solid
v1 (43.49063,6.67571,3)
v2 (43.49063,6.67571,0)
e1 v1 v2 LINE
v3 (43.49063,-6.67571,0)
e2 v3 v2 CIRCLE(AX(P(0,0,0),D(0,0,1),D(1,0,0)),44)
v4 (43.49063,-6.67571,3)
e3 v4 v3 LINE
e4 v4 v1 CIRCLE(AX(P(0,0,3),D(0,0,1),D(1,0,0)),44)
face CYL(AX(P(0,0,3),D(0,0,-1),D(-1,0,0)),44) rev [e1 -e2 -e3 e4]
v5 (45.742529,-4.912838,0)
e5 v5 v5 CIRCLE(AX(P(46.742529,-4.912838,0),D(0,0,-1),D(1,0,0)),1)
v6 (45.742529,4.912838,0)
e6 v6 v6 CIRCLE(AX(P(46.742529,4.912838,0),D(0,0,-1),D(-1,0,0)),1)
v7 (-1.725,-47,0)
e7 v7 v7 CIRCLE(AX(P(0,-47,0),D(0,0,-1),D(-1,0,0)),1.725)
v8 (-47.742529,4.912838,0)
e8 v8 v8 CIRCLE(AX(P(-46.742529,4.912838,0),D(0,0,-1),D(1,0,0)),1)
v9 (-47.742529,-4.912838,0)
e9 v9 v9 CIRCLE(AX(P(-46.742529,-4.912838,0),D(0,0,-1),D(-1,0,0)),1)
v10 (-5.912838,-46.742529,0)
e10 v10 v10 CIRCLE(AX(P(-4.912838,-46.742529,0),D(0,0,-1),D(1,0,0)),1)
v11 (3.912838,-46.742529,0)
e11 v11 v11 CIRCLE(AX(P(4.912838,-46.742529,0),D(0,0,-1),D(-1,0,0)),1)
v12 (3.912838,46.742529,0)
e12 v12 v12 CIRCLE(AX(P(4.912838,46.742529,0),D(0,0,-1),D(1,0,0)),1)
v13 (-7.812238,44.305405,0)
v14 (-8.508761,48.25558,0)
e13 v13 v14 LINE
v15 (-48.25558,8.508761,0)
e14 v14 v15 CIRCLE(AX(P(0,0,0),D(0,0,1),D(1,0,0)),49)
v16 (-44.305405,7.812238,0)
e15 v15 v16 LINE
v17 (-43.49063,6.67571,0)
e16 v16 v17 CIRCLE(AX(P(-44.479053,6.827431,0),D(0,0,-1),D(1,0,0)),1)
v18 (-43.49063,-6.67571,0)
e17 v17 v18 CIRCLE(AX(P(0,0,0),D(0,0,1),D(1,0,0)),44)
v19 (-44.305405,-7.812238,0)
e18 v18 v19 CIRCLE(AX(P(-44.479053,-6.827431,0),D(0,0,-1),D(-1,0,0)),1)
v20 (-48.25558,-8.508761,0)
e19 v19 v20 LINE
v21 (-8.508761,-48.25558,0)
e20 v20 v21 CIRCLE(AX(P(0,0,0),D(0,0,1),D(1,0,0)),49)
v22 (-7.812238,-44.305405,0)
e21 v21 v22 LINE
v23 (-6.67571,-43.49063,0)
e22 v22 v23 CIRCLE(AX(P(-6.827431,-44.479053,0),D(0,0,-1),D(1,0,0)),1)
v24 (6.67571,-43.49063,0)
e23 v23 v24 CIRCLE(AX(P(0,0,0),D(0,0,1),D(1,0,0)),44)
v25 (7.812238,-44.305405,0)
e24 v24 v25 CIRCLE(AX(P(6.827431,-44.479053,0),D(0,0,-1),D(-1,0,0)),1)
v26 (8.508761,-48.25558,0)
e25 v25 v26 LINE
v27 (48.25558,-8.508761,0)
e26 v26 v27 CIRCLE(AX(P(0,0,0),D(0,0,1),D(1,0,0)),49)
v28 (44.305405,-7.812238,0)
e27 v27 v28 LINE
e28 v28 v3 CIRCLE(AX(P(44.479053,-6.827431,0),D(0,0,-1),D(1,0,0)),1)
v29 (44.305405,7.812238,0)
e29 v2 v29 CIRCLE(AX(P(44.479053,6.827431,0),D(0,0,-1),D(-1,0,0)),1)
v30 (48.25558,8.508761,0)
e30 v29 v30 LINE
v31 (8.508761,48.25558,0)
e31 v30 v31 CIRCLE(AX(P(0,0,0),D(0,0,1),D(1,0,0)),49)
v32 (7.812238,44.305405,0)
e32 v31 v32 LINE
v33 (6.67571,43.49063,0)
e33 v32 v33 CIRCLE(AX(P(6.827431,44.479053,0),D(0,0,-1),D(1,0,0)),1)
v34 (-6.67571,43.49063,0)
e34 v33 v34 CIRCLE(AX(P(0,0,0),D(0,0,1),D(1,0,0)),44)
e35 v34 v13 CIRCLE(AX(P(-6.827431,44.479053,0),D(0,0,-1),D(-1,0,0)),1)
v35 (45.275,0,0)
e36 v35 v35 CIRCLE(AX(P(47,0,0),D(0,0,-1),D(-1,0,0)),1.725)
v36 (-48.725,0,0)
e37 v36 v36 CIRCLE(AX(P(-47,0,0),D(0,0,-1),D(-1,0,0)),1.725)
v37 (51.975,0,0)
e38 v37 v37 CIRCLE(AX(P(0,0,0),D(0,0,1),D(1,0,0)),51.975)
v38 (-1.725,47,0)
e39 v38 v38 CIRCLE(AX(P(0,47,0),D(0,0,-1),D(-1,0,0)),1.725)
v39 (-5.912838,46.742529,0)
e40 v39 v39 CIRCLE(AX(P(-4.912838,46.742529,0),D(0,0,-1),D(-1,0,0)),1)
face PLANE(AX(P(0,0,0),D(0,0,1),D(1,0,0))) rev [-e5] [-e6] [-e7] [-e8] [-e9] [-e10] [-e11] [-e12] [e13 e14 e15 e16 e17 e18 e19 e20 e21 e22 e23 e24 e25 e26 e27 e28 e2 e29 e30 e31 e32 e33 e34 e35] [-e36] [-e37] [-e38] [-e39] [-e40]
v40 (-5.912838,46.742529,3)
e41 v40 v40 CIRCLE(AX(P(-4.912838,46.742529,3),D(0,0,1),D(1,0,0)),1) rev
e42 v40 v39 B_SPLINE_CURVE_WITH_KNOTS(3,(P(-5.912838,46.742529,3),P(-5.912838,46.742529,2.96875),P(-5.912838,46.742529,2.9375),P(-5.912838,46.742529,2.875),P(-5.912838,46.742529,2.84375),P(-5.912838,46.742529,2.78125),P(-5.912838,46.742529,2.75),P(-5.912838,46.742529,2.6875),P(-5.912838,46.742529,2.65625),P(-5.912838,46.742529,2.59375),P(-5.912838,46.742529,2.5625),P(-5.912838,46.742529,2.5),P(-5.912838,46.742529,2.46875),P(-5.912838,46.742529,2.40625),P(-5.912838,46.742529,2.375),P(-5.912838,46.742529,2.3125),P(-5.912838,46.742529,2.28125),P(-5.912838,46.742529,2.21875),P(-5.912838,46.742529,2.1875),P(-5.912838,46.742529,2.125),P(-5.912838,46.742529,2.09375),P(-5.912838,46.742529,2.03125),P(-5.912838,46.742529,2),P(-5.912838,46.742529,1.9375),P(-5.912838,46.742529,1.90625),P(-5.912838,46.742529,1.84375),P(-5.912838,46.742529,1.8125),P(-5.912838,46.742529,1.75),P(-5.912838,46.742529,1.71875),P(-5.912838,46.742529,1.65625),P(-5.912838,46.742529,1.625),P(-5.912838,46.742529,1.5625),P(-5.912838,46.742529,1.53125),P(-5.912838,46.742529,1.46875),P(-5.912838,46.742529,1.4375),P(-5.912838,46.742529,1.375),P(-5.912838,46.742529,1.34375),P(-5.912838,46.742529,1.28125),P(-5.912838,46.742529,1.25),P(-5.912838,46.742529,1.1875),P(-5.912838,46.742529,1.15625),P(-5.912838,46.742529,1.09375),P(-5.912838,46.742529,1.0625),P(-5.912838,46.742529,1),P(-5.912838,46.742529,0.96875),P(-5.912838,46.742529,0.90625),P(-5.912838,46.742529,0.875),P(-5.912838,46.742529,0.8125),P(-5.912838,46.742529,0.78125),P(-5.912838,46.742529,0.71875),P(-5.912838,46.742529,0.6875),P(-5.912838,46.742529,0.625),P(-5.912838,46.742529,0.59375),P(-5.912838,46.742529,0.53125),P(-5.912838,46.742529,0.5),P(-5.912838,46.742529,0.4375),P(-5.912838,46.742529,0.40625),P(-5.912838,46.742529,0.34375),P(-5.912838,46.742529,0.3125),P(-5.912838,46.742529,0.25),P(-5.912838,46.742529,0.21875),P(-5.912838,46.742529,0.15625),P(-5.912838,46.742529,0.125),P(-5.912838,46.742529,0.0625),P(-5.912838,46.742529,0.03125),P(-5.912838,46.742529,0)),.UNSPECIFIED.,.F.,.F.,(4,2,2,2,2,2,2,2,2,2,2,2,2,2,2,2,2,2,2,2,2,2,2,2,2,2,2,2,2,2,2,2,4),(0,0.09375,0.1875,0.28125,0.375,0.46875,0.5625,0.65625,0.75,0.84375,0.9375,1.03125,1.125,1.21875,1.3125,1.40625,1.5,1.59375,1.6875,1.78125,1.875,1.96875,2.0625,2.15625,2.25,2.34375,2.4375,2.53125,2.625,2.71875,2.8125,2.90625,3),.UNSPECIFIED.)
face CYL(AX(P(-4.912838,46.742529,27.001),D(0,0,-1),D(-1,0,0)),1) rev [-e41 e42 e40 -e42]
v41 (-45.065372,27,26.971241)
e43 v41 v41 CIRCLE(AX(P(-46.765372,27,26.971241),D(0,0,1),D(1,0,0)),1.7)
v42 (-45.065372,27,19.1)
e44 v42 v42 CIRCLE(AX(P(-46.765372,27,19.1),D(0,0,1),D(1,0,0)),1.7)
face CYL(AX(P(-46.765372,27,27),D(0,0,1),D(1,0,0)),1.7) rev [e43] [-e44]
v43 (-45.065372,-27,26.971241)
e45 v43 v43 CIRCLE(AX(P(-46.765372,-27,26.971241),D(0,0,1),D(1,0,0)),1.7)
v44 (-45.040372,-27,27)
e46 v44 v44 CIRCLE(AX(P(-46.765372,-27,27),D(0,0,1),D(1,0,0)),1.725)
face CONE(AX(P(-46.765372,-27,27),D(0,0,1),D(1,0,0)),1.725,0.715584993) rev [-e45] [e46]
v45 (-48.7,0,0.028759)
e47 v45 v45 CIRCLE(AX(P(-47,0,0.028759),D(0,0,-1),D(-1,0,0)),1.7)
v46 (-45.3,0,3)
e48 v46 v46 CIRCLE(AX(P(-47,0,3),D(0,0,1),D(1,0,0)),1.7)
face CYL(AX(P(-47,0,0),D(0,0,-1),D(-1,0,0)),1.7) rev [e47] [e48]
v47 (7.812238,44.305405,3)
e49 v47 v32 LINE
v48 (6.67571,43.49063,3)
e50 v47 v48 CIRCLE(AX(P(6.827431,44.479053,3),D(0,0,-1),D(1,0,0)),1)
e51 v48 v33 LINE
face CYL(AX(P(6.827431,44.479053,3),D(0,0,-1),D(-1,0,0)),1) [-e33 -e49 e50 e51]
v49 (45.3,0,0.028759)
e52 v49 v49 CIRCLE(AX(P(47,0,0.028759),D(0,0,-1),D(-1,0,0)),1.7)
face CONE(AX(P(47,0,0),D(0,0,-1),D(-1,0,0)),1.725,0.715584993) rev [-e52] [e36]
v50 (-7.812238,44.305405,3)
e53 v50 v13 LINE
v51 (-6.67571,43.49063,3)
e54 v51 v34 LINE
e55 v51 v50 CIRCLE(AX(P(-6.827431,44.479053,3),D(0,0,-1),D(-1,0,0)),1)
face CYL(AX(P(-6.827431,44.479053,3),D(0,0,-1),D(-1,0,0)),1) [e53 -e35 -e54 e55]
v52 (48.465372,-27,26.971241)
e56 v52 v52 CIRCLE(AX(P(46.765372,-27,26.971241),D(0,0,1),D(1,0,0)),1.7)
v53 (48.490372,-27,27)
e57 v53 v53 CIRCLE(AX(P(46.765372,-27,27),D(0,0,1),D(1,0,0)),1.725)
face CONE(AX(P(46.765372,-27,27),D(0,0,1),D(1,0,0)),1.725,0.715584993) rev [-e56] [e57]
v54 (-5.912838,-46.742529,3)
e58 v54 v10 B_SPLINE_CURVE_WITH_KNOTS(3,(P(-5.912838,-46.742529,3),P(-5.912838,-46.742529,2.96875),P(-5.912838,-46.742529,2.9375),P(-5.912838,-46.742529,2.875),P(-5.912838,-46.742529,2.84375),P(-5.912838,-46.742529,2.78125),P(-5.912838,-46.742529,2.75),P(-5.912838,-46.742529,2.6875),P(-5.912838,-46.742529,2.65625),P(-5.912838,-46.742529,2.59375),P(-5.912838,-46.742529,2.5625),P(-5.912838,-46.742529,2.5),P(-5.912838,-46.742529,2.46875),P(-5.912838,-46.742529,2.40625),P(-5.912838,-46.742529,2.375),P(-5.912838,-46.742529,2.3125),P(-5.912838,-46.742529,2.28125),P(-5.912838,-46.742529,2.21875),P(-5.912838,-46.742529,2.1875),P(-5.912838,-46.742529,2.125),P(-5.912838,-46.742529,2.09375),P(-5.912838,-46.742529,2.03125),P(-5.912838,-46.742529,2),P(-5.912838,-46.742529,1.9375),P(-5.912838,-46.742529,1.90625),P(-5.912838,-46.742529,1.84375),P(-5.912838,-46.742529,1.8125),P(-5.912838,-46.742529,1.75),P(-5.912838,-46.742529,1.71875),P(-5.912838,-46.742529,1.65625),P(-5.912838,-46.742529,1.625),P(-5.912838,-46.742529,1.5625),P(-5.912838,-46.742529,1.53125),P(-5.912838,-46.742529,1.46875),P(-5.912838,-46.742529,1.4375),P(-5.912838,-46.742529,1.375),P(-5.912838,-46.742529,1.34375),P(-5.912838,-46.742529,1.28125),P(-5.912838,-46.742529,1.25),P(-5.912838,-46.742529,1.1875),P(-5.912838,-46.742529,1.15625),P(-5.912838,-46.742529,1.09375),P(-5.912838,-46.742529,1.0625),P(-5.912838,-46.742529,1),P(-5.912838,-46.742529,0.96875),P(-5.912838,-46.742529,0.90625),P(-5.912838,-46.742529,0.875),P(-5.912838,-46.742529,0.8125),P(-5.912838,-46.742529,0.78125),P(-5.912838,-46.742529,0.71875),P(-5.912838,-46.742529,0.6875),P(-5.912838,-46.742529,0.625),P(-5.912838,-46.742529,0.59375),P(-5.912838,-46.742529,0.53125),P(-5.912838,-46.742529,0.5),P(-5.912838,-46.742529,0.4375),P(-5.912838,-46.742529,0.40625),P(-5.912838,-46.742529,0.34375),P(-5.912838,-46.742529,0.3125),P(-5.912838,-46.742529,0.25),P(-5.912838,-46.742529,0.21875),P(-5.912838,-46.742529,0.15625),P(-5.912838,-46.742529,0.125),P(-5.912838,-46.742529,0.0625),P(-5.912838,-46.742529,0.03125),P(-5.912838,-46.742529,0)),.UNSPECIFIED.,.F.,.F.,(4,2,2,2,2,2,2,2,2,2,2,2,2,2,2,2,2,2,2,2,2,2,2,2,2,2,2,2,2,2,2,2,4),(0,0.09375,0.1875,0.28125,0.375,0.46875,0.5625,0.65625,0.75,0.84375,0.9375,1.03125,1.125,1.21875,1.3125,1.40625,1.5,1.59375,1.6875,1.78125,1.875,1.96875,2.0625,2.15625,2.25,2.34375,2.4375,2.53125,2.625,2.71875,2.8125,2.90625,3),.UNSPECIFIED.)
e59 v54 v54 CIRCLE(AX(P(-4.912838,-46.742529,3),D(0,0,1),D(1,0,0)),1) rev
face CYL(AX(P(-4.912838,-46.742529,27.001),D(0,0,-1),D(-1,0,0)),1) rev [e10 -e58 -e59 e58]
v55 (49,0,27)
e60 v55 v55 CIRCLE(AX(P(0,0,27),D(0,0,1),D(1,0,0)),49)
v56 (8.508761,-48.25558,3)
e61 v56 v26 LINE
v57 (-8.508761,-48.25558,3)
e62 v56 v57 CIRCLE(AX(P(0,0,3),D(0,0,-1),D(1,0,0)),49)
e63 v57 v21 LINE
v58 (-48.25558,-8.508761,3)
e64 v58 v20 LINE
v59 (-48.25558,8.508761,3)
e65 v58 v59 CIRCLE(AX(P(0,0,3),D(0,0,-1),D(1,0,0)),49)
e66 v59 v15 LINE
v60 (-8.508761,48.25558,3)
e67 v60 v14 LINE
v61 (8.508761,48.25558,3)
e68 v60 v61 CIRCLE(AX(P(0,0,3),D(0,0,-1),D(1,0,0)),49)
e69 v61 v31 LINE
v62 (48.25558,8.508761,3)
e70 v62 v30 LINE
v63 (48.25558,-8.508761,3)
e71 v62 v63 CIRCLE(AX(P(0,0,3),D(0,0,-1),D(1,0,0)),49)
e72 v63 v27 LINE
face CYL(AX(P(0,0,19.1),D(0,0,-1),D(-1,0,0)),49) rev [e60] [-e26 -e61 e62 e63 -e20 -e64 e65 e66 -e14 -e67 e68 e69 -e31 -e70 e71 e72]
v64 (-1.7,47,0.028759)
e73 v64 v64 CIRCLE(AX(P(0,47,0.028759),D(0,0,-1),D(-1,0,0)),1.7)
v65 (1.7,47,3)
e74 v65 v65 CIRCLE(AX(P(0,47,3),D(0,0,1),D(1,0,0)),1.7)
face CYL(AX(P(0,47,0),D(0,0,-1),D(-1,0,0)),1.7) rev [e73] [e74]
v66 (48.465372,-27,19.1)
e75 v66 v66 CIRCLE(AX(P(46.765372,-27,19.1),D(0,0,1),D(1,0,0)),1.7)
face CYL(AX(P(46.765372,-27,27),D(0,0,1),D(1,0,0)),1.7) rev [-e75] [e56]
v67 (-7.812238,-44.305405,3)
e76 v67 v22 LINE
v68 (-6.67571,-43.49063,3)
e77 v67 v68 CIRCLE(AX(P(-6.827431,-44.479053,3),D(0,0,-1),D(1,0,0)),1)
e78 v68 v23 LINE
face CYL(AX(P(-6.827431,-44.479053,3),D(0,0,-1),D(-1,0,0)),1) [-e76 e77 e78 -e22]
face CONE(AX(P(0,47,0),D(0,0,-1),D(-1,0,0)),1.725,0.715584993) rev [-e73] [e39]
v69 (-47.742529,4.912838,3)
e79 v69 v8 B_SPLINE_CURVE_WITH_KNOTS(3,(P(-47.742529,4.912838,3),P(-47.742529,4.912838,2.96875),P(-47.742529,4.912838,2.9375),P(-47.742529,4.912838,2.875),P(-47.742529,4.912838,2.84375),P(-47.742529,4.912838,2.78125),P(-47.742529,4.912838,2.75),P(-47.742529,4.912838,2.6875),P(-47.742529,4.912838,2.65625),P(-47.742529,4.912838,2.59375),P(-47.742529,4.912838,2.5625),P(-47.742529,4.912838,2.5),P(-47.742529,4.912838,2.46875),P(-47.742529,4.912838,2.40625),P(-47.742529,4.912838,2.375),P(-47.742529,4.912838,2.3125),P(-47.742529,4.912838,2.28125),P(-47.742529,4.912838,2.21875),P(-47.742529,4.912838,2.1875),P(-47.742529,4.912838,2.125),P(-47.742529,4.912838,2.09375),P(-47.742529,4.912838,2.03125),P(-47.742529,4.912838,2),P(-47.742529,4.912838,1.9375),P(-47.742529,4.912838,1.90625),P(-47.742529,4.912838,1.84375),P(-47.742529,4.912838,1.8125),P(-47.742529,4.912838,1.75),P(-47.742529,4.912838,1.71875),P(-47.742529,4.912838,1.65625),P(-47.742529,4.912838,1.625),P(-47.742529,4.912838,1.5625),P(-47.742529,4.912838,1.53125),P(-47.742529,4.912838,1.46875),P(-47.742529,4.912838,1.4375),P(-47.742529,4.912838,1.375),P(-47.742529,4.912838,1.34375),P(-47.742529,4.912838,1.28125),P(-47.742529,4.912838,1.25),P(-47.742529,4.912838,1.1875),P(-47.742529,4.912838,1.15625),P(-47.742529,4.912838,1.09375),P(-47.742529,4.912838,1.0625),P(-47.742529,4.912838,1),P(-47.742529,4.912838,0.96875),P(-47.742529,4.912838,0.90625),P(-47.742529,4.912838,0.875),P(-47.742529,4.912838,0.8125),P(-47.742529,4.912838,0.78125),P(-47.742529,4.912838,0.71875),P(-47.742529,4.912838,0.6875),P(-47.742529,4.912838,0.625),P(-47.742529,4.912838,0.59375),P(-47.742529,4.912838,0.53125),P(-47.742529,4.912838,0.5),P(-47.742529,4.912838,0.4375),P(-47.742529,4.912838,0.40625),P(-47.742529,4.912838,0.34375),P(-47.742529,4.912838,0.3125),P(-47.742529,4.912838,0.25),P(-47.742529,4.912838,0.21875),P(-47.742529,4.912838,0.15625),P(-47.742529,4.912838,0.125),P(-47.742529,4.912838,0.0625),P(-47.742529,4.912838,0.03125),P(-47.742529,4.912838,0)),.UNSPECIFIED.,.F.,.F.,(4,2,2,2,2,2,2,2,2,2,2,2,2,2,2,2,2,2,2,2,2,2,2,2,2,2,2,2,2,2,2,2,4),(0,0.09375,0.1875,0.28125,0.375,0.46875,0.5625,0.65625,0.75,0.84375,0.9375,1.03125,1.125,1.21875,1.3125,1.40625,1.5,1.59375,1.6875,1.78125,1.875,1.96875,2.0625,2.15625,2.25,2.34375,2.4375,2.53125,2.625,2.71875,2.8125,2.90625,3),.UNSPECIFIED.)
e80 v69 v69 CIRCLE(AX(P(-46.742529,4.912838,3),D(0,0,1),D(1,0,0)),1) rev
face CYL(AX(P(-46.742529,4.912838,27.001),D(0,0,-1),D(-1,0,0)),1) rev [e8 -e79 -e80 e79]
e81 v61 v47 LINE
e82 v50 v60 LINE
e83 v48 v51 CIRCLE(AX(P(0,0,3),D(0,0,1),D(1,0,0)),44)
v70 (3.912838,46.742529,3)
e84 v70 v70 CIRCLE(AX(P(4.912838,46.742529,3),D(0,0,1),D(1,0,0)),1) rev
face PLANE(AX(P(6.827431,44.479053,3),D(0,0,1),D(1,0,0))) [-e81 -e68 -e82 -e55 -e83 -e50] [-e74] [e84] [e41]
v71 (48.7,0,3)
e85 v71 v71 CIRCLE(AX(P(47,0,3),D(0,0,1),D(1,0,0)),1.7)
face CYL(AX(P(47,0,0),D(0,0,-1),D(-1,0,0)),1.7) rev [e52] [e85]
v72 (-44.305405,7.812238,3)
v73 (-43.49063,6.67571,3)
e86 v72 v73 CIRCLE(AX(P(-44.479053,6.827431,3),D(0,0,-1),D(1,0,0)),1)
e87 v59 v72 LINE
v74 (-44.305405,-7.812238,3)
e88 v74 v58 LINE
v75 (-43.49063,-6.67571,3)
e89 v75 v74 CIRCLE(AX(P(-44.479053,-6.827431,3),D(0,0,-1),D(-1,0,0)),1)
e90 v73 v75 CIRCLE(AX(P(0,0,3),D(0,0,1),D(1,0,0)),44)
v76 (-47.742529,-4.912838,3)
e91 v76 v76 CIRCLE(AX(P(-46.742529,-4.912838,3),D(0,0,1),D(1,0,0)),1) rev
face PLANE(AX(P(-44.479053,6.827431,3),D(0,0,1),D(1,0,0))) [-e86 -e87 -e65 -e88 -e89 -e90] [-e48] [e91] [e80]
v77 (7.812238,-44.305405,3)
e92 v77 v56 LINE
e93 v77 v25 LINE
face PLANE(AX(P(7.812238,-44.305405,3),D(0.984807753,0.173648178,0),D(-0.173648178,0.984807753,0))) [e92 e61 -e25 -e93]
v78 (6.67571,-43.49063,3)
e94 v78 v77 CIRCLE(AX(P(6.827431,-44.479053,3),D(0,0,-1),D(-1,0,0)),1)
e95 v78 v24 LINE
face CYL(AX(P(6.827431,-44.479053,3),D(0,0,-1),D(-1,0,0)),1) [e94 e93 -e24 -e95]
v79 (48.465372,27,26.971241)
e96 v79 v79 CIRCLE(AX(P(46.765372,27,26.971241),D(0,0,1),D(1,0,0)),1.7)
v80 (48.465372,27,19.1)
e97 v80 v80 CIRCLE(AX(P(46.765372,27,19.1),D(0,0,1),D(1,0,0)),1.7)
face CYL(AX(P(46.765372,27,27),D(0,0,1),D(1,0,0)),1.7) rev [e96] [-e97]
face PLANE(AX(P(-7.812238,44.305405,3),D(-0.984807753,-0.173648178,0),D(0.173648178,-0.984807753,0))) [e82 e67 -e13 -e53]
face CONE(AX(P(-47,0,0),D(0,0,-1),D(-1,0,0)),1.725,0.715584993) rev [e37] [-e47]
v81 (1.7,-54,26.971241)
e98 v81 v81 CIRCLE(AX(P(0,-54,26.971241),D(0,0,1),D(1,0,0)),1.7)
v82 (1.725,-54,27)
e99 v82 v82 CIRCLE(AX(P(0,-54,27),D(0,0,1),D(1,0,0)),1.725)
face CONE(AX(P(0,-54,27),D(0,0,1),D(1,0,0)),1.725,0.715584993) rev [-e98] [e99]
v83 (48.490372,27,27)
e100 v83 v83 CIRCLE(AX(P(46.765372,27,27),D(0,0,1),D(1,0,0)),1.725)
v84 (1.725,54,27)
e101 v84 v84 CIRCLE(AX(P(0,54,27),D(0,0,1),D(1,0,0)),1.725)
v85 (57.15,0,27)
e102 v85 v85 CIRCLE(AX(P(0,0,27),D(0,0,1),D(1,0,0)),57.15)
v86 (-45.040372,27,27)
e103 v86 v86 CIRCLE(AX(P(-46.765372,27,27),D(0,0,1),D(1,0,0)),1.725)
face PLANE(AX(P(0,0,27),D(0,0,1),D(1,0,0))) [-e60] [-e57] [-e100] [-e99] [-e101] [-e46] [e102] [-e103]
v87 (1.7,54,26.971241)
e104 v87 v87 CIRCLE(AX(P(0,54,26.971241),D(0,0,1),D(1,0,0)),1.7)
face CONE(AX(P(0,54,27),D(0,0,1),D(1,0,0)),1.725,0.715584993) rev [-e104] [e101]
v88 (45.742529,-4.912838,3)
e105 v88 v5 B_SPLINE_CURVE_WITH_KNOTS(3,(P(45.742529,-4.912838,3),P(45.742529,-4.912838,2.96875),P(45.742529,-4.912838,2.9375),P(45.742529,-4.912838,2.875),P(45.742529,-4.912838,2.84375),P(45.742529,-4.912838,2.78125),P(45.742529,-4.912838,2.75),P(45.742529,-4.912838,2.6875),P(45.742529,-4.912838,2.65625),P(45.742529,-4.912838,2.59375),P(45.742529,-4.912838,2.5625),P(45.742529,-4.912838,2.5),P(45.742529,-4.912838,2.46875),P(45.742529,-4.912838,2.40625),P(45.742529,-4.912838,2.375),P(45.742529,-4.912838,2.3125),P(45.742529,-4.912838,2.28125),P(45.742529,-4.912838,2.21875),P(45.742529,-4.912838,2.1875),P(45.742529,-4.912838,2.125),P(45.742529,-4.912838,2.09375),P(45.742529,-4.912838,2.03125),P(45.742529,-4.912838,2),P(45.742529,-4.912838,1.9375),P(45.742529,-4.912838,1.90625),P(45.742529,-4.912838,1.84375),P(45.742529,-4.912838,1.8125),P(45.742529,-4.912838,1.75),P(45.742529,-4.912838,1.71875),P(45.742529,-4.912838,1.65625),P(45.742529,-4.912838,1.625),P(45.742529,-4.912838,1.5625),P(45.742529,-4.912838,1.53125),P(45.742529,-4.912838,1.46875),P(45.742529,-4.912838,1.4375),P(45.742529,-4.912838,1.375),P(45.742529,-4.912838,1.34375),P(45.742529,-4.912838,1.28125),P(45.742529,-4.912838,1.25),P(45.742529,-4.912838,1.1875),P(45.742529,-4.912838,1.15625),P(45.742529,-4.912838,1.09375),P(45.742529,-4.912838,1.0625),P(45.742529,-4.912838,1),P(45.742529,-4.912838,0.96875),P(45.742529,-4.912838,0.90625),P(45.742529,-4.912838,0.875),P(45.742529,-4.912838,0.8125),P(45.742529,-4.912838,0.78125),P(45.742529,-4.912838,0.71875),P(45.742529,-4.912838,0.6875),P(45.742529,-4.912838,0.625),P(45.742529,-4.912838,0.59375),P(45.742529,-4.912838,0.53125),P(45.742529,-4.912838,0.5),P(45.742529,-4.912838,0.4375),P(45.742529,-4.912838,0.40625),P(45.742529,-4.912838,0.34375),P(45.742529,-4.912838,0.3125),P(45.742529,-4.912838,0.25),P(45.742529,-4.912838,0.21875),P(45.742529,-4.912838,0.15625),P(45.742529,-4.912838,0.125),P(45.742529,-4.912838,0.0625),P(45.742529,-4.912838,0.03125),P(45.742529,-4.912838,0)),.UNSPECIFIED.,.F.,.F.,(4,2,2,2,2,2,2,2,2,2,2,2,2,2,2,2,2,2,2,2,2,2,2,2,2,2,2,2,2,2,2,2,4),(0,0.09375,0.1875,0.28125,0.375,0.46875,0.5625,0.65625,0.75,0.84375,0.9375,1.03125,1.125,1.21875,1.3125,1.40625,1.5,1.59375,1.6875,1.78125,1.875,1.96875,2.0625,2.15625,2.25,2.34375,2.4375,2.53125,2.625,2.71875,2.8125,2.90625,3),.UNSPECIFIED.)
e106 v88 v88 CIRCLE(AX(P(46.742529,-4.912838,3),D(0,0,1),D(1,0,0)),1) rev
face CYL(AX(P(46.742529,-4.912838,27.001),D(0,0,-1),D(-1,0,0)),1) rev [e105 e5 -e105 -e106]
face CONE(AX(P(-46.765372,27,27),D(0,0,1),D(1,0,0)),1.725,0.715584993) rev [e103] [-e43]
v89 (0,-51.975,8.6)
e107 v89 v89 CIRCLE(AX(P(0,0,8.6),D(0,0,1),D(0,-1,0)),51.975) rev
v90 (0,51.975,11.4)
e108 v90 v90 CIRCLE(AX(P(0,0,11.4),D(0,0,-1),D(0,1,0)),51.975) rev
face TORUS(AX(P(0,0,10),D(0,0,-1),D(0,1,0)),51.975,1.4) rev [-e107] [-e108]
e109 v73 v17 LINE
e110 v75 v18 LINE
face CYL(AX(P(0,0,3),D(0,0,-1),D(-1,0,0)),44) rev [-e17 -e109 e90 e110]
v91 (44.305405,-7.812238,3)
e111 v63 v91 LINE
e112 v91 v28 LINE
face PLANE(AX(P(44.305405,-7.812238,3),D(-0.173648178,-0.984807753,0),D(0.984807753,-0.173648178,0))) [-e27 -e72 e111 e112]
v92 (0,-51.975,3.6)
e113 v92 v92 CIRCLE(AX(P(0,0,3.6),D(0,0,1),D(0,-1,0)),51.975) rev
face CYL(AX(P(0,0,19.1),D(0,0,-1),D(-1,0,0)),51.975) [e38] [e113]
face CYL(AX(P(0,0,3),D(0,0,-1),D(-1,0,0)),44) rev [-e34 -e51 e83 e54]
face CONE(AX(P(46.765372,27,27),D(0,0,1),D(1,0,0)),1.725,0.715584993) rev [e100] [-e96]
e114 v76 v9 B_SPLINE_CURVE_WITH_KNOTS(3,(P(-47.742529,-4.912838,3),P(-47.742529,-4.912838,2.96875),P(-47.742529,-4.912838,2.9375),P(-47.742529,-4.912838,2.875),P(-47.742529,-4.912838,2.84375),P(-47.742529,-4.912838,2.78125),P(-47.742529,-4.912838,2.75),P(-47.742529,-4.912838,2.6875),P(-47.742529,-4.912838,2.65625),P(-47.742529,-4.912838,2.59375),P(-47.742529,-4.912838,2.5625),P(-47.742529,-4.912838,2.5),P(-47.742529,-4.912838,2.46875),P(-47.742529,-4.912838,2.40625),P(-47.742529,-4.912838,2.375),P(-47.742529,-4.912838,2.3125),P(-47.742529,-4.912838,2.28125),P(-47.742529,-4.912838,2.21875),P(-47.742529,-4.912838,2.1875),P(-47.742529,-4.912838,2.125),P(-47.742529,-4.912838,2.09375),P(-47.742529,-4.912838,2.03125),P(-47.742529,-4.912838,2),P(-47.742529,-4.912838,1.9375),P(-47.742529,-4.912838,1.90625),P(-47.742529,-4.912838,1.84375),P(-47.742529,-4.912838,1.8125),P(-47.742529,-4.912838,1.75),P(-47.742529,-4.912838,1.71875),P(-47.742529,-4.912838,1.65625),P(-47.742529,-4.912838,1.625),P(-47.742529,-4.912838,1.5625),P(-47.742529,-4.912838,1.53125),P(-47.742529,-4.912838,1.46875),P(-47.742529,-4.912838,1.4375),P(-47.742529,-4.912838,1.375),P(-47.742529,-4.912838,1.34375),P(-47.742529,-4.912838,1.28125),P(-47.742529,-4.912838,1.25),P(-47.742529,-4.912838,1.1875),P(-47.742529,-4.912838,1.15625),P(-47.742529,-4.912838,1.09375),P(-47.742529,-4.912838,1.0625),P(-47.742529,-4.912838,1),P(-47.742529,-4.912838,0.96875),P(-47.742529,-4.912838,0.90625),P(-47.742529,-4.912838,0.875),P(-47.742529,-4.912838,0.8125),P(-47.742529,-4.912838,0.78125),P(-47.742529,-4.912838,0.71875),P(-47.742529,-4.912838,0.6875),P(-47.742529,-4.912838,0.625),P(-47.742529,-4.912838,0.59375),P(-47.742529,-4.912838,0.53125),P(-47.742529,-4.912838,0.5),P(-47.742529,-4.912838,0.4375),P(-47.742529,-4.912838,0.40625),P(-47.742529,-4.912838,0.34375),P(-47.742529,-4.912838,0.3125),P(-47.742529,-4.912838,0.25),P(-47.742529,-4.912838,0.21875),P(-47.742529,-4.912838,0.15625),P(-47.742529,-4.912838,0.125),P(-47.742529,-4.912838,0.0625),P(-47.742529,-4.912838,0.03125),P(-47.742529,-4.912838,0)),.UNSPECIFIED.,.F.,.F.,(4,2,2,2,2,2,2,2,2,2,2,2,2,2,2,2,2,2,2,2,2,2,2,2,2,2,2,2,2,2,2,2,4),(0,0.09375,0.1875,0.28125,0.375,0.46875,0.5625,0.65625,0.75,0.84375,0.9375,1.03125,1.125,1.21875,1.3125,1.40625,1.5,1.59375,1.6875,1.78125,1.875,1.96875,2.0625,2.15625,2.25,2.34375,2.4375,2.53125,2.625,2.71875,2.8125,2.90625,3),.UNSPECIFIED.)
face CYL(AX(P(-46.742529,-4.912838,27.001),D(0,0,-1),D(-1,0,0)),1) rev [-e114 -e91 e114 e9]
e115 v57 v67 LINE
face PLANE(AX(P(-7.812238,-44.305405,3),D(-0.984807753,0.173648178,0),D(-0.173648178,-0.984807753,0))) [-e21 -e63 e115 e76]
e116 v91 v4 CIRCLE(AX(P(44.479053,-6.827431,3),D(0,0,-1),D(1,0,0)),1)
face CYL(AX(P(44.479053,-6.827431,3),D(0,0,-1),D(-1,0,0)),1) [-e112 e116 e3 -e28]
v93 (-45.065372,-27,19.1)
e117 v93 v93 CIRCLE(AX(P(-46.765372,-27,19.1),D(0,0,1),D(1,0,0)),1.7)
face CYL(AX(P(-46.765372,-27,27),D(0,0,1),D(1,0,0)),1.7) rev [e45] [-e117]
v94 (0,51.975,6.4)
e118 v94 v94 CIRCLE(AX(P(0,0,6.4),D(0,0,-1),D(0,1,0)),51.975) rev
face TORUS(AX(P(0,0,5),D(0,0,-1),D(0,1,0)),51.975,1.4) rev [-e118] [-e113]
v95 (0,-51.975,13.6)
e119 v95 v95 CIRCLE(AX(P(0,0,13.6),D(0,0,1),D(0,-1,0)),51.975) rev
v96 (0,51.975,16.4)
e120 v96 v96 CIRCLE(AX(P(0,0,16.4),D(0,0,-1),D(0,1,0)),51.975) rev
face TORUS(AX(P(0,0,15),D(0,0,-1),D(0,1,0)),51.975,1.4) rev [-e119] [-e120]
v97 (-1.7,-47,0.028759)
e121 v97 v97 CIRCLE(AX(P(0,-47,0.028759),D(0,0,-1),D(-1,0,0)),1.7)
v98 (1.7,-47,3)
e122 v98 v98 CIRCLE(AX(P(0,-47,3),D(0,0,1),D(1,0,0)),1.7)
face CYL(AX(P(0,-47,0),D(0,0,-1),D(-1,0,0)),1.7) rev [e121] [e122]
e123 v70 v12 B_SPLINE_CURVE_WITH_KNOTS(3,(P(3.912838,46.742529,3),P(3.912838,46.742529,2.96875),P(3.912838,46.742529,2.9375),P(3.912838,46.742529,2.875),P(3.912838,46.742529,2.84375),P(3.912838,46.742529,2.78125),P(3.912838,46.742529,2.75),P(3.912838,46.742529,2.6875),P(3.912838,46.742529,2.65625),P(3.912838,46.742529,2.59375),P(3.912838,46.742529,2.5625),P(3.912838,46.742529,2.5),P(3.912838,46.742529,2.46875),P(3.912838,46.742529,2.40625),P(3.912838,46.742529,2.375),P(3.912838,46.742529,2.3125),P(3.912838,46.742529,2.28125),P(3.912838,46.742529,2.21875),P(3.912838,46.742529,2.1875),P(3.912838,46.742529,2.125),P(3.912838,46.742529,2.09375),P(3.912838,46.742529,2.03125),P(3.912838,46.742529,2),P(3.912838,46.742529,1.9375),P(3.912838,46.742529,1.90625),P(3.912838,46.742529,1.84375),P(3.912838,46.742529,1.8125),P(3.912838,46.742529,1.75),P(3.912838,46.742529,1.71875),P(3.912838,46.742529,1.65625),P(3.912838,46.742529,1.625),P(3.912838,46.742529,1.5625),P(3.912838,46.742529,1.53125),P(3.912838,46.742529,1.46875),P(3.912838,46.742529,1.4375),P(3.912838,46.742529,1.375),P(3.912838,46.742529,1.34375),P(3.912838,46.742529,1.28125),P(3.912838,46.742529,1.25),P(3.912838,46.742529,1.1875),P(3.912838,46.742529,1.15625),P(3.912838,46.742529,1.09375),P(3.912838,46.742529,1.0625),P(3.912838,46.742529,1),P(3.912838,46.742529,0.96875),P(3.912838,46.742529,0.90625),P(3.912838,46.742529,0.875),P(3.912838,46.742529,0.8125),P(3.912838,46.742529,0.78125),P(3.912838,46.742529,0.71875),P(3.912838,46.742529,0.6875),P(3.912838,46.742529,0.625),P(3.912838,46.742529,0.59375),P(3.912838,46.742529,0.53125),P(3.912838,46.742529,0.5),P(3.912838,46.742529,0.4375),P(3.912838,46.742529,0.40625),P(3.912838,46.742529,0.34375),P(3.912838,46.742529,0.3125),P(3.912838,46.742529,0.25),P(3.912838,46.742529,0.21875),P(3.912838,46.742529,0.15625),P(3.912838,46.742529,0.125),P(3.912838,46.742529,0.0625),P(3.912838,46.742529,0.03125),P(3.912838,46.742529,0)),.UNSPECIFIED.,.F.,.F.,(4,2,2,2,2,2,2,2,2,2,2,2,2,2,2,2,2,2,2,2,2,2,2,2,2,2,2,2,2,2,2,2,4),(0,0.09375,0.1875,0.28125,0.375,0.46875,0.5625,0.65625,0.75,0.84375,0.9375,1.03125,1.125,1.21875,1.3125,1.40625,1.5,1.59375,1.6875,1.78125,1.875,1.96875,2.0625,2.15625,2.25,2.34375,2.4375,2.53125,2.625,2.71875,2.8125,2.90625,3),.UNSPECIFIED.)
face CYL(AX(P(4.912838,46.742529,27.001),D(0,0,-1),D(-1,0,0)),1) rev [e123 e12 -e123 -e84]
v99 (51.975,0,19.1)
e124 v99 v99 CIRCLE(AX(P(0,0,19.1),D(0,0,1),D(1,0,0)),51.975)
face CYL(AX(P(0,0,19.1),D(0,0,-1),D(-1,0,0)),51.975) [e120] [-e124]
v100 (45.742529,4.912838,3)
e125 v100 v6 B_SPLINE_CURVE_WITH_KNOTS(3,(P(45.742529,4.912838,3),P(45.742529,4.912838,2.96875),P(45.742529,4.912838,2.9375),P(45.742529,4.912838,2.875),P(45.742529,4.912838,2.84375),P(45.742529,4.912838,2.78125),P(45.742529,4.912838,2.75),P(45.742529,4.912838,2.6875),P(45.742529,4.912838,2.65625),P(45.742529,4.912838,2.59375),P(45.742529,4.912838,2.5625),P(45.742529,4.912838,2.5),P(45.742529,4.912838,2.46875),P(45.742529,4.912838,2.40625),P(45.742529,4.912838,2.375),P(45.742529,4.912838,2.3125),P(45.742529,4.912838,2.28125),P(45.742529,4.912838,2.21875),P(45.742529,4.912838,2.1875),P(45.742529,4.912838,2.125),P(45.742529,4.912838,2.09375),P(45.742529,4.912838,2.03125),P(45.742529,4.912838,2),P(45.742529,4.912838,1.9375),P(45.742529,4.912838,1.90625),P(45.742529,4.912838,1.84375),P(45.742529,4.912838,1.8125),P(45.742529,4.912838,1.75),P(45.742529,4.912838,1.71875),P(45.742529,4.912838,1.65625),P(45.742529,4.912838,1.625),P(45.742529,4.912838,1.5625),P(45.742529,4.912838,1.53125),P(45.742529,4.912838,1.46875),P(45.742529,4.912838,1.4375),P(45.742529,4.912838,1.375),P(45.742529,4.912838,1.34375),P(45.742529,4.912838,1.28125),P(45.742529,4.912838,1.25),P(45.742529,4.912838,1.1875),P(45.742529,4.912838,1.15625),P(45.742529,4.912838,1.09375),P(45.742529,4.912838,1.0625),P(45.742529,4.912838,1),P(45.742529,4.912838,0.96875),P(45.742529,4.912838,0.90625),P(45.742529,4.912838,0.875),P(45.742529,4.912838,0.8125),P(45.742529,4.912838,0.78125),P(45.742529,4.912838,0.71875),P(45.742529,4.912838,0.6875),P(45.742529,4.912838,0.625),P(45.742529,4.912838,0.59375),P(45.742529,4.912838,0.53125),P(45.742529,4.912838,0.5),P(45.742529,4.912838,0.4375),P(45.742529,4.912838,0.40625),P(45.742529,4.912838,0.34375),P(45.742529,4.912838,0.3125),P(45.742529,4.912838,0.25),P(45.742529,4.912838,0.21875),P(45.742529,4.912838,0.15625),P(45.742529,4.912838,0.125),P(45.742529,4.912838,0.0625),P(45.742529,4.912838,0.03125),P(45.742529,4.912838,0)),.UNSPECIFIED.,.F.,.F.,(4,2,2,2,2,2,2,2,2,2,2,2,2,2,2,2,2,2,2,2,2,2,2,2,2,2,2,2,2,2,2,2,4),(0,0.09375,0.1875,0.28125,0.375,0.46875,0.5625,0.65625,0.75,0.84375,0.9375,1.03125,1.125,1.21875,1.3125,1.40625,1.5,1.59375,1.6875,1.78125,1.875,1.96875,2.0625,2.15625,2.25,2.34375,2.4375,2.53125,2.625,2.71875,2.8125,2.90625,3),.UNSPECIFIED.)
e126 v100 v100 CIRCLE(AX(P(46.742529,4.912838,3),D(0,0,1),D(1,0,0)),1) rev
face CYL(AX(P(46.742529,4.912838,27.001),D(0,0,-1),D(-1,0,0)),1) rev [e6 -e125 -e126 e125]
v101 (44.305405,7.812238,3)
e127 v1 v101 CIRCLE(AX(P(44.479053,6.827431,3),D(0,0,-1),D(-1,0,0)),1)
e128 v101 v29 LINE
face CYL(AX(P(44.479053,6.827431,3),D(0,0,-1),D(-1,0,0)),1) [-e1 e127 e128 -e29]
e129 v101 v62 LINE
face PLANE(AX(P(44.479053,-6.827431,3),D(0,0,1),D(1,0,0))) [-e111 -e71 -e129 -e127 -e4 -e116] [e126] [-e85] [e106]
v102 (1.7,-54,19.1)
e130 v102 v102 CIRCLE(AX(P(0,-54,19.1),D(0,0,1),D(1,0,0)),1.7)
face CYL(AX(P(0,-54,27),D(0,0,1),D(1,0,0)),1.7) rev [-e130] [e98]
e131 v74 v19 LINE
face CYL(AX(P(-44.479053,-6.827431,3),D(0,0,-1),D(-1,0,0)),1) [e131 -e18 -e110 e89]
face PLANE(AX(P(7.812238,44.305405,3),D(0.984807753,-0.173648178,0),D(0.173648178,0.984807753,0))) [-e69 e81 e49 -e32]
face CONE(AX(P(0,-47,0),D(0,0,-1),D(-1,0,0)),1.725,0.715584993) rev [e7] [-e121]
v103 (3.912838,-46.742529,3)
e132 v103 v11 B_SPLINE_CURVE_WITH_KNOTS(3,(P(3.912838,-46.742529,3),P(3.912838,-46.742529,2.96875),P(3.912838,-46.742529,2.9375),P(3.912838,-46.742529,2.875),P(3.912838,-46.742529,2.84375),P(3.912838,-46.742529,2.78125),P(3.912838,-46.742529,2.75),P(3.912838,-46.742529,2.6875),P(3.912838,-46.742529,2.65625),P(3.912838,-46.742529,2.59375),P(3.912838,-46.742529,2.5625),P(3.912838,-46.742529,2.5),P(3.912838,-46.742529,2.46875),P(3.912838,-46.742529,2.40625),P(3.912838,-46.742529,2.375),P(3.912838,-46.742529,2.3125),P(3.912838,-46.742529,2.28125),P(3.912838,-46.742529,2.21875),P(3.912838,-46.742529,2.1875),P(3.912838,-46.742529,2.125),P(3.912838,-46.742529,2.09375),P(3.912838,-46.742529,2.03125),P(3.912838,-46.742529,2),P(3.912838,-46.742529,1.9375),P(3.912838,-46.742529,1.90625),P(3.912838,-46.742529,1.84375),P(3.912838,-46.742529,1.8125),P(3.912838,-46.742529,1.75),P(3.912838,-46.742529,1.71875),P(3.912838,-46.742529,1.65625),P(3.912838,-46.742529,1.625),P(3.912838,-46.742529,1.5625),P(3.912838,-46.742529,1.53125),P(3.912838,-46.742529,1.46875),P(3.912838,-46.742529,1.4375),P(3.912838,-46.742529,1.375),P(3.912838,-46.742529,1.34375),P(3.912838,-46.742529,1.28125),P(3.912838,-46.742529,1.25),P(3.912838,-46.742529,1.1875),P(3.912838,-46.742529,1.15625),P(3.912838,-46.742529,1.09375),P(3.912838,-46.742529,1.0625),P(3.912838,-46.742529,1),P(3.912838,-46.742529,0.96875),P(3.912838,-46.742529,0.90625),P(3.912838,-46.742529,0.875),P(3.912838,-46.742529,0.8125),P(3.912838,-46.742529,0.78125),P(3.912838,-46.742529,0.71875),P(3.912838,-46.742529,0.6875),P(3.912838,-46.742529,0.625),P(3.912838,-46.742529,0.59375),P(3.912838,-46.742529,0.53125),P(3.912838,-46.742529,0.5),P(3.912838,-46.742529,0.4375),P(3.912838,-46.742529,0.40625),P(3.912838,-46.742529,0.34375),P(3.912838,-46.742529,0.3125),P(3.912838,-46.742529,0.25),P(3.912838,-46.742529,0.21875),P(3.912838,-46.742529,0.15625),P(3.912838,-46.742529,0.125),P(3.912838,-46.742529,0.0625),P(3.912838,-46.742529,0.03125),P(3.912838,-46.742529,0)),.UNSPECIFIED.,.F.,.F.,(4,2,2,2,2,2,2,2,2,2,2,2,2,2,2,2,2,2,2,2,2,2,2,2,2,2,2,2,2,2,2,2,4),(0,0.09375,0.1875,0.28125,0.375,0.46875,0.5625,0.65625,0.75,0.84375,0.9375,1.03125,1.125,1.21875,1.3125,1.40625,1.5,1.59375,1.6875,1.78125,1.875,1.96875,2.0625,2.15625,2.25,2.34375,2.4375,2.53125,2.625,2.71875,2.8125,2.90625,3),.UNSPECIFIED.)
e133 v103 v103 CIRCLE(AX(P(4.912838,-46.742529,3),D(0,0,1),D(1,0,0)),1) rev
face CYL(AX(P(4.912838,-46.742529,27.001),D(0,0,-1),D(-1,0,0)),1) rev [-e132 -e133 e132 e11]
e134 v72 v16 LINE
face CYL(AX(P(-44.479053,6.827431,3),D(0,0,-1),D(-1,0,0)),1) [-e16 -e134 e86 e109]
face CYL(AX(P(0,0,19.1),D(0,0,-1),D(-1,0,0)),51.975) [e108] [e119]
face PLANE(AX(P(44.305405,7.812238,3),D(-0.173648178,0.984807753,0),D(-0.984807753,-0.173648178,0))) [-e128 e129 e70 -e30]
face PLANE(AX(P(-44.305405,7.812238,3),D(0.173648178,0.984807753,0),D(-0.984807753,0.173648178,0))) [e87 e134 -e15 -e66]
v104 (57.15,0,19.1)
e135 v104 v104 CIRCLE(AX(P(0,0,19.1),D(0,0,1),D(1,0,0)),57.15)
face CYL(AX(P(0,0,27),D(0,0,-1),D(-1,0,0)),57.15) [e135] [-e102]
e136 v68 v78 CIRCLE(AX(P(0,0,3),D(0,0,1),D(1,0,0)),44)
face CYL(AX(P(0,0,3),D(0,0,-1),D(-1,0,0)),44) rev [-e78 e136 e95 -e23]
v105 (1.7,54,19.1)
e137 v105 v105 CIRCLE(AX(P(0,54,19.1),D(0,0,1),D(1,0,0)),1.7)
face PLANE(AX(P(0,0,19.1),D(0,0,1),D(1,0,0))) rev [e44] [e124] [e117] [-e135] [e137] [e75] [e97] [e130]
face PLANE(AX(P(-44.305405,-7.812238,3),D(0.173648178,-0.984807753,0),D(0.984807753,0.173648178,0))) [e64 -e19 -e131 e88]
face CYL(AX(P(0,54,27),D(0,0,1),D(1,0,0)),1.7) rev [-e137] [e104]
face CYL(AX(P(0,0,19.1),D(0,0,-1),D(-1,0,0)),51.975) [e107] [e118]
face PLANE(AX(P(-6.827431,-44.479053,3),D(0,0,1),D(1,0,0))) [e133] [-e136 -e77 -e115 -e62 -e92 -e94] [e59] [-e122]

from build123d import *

# Parameters (mm, degrees)
SKETCH_1_R                   = 51.975
SKETCH_1_R_2                 = 49
EXTRUDE_1_DEPTH              = 19.1
SKETCH_2_R                   = 57.15
SKETCH_2_R_2                 = 49
EXTRUDE_2_DEPTH              = 7.9
EXTRUDE_3_DEPTH              = 3
HOLE_WIZARD_M3_1_D           = 3.4
HOLE_WIZARD_M3_1_CSINK_D     = 3.45
HOLE_WIZARD_M3_1_CSINK_ANGLE = 82
CUT_EXTRUDE_1_REACH          = 87.213
SKETCH_6_R                   = 1
SKETCH_12_R                  = 1.4


# Read off the part's stored shape, not the designer's step: M3 すきま穴3
with BuildPart() as part:
    # ｽｹｯﾁ1 → ﾎﾞｽ - 押し出し1 (new body)
    with BuildSketch(Plane.XY):
        Circle(SKETCH_1_R)
        Circle(SKETCH_1_R_2, mode=Mode.SUBTRACT)
    extrude(amount=EXTRUDE_1_DEPTH)

    # ｽｹｯﾁ2 → ﾎﾞｽ - 押し出し2 (add)
    with BuildSketch(Plane.XY.offset(19.1)):
        Circle(SKETCH_2_R)
        Circle(SKETCH_2_R_2, mode=Mode.SUBTRACT)
    extrude(amount=EXTRUDE_2_DEPTH)

    # ｽｹｯﾁ3 → ﾎﾞｽ - 押し出し3 (add)
    with BuildSketch(Plane(origin=(0, 0, 0), x_dir=(-1, 0, 0), z_dir=(0, 0, -1))):
        with BuildLine():
            Line((7.812238333, 44.305405226), (8.508760706, 48.255579898))
            ThreePointArc((8.508760706, 48.255579898), (0, 49), (-8.508760706, 48.255579898))
            Line((-8.508760706, 48.255579898), (-7.812238333, 44.305405226))
            ThreePointArc((-7.812238333, 44.305405226), (-7.410073856, 43.666325397), (-6.6757099, 43.490629995))
            ThreePointArc((-6.6757099, 43.490629995), (0, 44), (6.6757099, 43.490629995))
            ThreePointArc((6.6757099, 43.490629995), (7.410073856, 43.666325397), (7.812238333, 44.305405226))
        make_face()
        with BuildLine():
            Line((44.305405226, -7.812238333), (48.255579898, -8.508760706))
            ThreePointArc((48.255579898, -8.508760706), (49, 0), (48.255579898, 8.508760706))
            Line((48.255579898, 8.508760706), (44.305405226, 7.812238333))
            ThreePointArc((44.305405226, 7.812238333), (43.666325397, 7.410073856), (43.490629995, 6.6757099))
            ThreePointArc((43.490629995, 6.6757099), (44, 0), (43.490629995, -6.6757099))
            ThreePointArc((43.490629995, -6.6757099), (43.666325397, -7.410073856), (44.305405226, -7.812238333))
        make_face()
        with BuildLine():
            Line((-7.812238333, -44.305405226), (-8.508760706, -48.255579898))
            ThreePointArc((-8.508760706, -48.255579898), (0, -49), (8.508760706, -48.255579898))
            Line((8.508760706, -48.255579898), (7.812238333, -44.305405226))
            ThreePointArc((7.812238333, -44.305405226), (7.410073856, -43.666325397), (6.6757099, -43.490629995))
            ThreePointArc((6.6757099, -43.490629995), (0, -44), (-6.6757099, -43.490629995))
            ThreePointArc((-6.6757099, -43.490629995), (-7.410073856, -43.666325397), (-7.812238333, -44.305405226))
        make_face()
        with BuildLine():
            Line((-44.305405226, 7.812238333), (-48.255579898, 8.508760706))
            ThreePointArc((-48.255579898, 8.508760706), (-49, 0), (-48.255579898, -8.508760706))
            Line((-48.255579898, -8.508760706), (-44.305405226, -7.812238333))
            ThreePointArc((-44.305405226, -7.812238333), (-43.666325397, -7.410073856), (-43.490629995, -6.6757099))
            ThreePointArc((-43.490629995, -6.6757099), (-44, 0), (-43.490629995, 6.6757099))
            ThreePointArc((-43.490629995, 6.6757099), (-43.666325397, 7.410073856), (-44.305405226, 7.812238333))
        make_face()
    extrude(amount=-EXTRUDE_3_DEPTH)

    # M3 すきま穴1 (through all)
    with Locations(Plane(origin=(0, 0, 0), x_dir=(-1, 0, 0), z_dir=(0, 0, -1))):
        with Locations((-47, 0), (0, 47), (47, 0), (0, -47)):
            CounterSinkHole(HOLE_WIZARD_M3_1_D / 2, HOLE_WIZARD_M3_1_CSINK_D / 2, counter_sink_angle=HOLE_WIZARD_M3_1_CSINK_ANGLE)

    # ｽｹｯﾁ6 → ｶｯﾄ - 押し出し1 (cut, up to next)
    with BuildSketch(Plane(origin=(0, 0, 0), x_dir=(-1, 0, 0), z_dir=(0, 0, -1)), mode=Mode.PRIVATE) as cut_extrude_1_sk1:
        with Locations((4.912837774, 46.742529082)):
            Circle(SKETCH_6_R)
    cut_extrude_1_tool1 = extrude(cut_extrude_1_sk1.sketch, amount=-CUT_EXTRUDE_1_REACH, mode=Mode.PRIVATE) & part.part
    # ｽｹｯﾁ6 → ｶｯﾄ - 押し出し1 (cut, up to next)
    with BuildSketch(Plane(origin=(0, 0, 0), x_dir=(-1, 0, 0), z_dir=(0, 0, -1)), mode=Mode.PRIVATE) as cut_extrude_1_sk2:
        with Locations((-4.912837774, 46.742529082)):
            Circle(SKETCH_6_R)
    cut_extrude_1_tool2 = extrude(cut_extrude_1_sk2.sketch, amount=-CUT_EXTRUDE_1_REACH, mode=Mode.PRIVATE) & part.part
    # ｽｹｯﾁ6 → ｶｯﾄ - 押し出し1 (cut, up to next)
    with BuildSketch(Plane(origin=(0, 0, 0), x_dir=(-1, 0, 0), z_dir=(0, 0, -1)), mode=Mode.PRIVATE) as cut_extrude_1_sk3:
        with Locations((46.742529082, 4.912837774)):
            Circle(SKETCH_6_R)
    cut_extrude_1_tool3 = extrude(cut_extrude_1_sk3.sketch, amount=-CUT_EXTRUDE_1_REACH, mode=Mode.PRIVATE) & part.part
    # ｽｹｯﾁ6 → ｶｯﾄ - 押し出し1 (cut, up to next)
    with BuildSketch(Plane(origin=(0, 0, 0), x_dir=(-1, 0, 0), z_dir=(0, 0, -1)), mode=Mode.PRIVATE) as cut_extrude_1_sk4:
        with Locations((46.742529082, -4.912837774)):
            Circle(SKETCH_6_R)
    cut_extrude_1_tool4 = extrude(cut_extrude_1_sk4.sketch, amount=-CUT_EXTRUDE_1_REACH, mode=Mode.PRIVATE) & part.part
    # ｽｹｯﾁ6 → ｶｯﾄ - 押し出し1 (cut, up to next)
    with BuildSketch(Plane(origin=(0, 0, 0), x_dir=(-1, 0, 0), z_dir=(0, 0, -1)), mode=Mode.PRIVATE) as cut_extrude_1_sk5:
        with Locations((4.912837774, -46.742529082)):
            Circle(SKETCH_6_R)
    cut_extrude_1_tool5 = extrude(cut_extrude_1_sk5.sketch, amount=-CUT_EXTRUDE_1_REACH, mode=Mode.PRIVATE) & part.part
    # ｽｹｯﾁ6 → ｶｯﾄ - 押し出し1 (cut, up to next)
    with BuildSketch(Plane(origin=(0, 0, 0), x_dir=(-1, 0, 0), z_dir=(0, 0, -1)), mode=Mode.PRIVATE) as cut_extrude_1_sk6:
        with Locations((-4.912837774, -46.742529082)):
            Circle(SKETCH_6_R)
    cut_extrude_1_tool6 = extrude(cut_extrude_1_sk6.sketch, amount=-CUT_EXTRUDE_1_REACH, mode=Mode.PRIVATE) & part.part
    # ｽｹｯﾁ6 → ｶｯﾄ - 押し出し1 (cut, up to next)
    with BuildSketch(Plane(origin=(0, 0, 0), x_dir=(-1, 0, 0), z_dir=(0, 0, -1)), mode=Mode.PRIVATE) as cut_extrude_1_sk7:
        with Locations((-46.742529082, -4.912837774)):
            Circle(SKETCH_6_R)
    cut_extrude_1_tool7 = extrude(cut_extrude_1_sk7.sketch, amount=-CUT_EXTRUDE_1_REACH, mode=Mode.PRIVATE) & part.part
    # ｽｹｯﾁ6 → ｶｯﾄ - 押し出し1 (cut, up to next)
    with BuildSketch(Plane(origin=(0, 0, 0), x_dir=(-1, 0, 0), z_dir=(0, 0, -1)), mode=Mode.PRIVATE) as cut_extrude_1_sk8:
        with Locations((-46.742529082, 4.912837774)):
            Circle(SKETCH_6_R)
    cut_extrude_1_tool8 = extrude(cut_extrude_1_sk8.sketch, amount=-CUT_EXTRUDE_1_REACH, mode=Mode.PRIVATE) & part.part
    add(cut_extrude_1_tool1.solids().sort_by_distance((-4.912838, 46.742529, 0))[0], mode=Mode.SUBTRACT)
    add(cut_extrude_1_tool2.solids().sort_by_distance((4.912838, 46.742529, 0))[0], mode=Mode.SUBTRACT)
    add(cut_extrude_1_tool3.solids().sort_by_distance((-46.742529, 4.912838, 0))[0], mode=Mode.SUBTRACT)
    add(cut_extrude_1_tool4.solids().sort_by_distance((-46.742529, -4.912838, 0))[0], mode=Mode.SUBTRACT)
    add(cut_extrude_1_tool5.solids().sort_by_distance((-4.912838, -46.742529, 0))[0], mode=Mode.SUBTRACT)
    add(cut_extrude_1_tool6.solids().sort_by_distance((4.912838, -46.742529, 0))[0], mode=Mode.SUBTRACT)
    add(cut_extrude_1_tool7.solids().sort_by_distance((46.742529, -4.912838, 0))[0], mode=Mode.SUBTRACT)
    add(cut_extrude_1_tool8.solids().sort_by_distance((46.742529, 4.912838, 0))[0], mode=Mode.SUBTRACT)

    # M3 すきま穴3 outline → M3 すきま穴3 (revolve, cut)
    with BuildSketch(Plane(origin=(-46.765371804, 27, 0), x_dir=(1, 0, 0), z_dir=(0, -1, 0))):
        Polygon((0, 19.1), (1.7, 19.1), (1.7, 26.97124079), (1.725, 27), (0, 27), align=None)
    revolve(axis=Axis((-46.765371804, 27, 0), (0, 0, 1)), mode=Mode.SUBTRACT)

    # Hole Wizard M3 _3 2 outline → Hole Wizard M3 _3 2 (revolve, cut)
    with BuildSketch(Plane(origin=(-46.765371804, -27, 0), x_dir=(1, 0, 0), z_dir=(0, -1, 0))):
        Polygon((0, 19.1), (1.7, 19.1), (1.7, 26.97124079), (1.725, 27), (0, 27), align=None)
    revolve(axis=Axis((-46.765371804, -27, 0), (0, 0, 1)), mode=Mode.SUBTRACT)

    # Hole Wizard M3 _3 3 outline → Hole Wizard M3 _3 3 (revolve, cut)
    with BuildSketch(Plane.XZ.offset(54)):
        Polygon((0, 19.1), (1.7, 19.1), (1.7, 26.97124079), (1.725, 27), (0, 27), align=None)
    revolve(axis=Axis((0, -54, 0), (0, 0, 1)), mode=Mode.SUBTRACT)

    # Hole Wizard M3 _3 4 outline → Hole Wizard M3 _3 4 (revolve, cut)
    with BuildSketch(Plane(origin=(46.765371804, -27, 0), x_dir=(1, 0, 0), z_dir=(0, -1, 0))):
        Polygon((0, 19.1), (1.7, 19.1), (1.7, 26.97124079), (1.725, 27), (0, 27), align=None)
    revolve(axis=Axis((46.765371804, -27, 0), (0, 0, 1)), mode=Mode.SUBTRACT)

    # Hole Wizard M3 _3 5 outline → Hole Wizard M3 _3 5 (revolve, cut)
    with BuildSketch(Plane(origin=(46.765371804, 27, 0), x_dir=(1, 0, 0), z_dir=(0, -1, 0))):
        Polygon((0, 19.1), (1.7, 19.1), (1.7, 26.97124079), (1.725, 27), (0, 27), align=None)
    revolve(axis=Axis((46.765371804, 27, 0), (0, 0, 1)), mode=Mode.SUBTRACT)

    # Hole Wizard M3 _3 6 outline → Hole Wizard M3 _3 6 (revolve, cut)
    with BuildSketch(Plane.XZ.offset(-54)):
        Polygon((0, 19.1), (1.7, 19.1), (1.7, 26.97124079), (1.725, 27), (0, 27), align=None)
    revolve(axis=Axis((0, 54, 0), (0, 0, 1)), mode=Mode.SUBTRACT)

    # ｽｹｯﾁ12 → ｶｯﾄ - 回転1 (revolve, cut)
    with BuildSketch(Plane(origin=(0, 0, 0), x_dir=(0, 0, -1), z_dir=(1, 0, 0))):
        with Locations((-5, 51.975)):
            Circle(SKETCH_12_R)
        with Locations((-10, 51.975)):
            Circle(SKETCH_12_R)
        with Locations((-15, 51.975)):
            Circle(SKETCH_12_R)
    revolve(axis=Axis((0, 0, 0), (0, 0, 1)), mode=Mode.SUBTRACT)


solid = part.part
